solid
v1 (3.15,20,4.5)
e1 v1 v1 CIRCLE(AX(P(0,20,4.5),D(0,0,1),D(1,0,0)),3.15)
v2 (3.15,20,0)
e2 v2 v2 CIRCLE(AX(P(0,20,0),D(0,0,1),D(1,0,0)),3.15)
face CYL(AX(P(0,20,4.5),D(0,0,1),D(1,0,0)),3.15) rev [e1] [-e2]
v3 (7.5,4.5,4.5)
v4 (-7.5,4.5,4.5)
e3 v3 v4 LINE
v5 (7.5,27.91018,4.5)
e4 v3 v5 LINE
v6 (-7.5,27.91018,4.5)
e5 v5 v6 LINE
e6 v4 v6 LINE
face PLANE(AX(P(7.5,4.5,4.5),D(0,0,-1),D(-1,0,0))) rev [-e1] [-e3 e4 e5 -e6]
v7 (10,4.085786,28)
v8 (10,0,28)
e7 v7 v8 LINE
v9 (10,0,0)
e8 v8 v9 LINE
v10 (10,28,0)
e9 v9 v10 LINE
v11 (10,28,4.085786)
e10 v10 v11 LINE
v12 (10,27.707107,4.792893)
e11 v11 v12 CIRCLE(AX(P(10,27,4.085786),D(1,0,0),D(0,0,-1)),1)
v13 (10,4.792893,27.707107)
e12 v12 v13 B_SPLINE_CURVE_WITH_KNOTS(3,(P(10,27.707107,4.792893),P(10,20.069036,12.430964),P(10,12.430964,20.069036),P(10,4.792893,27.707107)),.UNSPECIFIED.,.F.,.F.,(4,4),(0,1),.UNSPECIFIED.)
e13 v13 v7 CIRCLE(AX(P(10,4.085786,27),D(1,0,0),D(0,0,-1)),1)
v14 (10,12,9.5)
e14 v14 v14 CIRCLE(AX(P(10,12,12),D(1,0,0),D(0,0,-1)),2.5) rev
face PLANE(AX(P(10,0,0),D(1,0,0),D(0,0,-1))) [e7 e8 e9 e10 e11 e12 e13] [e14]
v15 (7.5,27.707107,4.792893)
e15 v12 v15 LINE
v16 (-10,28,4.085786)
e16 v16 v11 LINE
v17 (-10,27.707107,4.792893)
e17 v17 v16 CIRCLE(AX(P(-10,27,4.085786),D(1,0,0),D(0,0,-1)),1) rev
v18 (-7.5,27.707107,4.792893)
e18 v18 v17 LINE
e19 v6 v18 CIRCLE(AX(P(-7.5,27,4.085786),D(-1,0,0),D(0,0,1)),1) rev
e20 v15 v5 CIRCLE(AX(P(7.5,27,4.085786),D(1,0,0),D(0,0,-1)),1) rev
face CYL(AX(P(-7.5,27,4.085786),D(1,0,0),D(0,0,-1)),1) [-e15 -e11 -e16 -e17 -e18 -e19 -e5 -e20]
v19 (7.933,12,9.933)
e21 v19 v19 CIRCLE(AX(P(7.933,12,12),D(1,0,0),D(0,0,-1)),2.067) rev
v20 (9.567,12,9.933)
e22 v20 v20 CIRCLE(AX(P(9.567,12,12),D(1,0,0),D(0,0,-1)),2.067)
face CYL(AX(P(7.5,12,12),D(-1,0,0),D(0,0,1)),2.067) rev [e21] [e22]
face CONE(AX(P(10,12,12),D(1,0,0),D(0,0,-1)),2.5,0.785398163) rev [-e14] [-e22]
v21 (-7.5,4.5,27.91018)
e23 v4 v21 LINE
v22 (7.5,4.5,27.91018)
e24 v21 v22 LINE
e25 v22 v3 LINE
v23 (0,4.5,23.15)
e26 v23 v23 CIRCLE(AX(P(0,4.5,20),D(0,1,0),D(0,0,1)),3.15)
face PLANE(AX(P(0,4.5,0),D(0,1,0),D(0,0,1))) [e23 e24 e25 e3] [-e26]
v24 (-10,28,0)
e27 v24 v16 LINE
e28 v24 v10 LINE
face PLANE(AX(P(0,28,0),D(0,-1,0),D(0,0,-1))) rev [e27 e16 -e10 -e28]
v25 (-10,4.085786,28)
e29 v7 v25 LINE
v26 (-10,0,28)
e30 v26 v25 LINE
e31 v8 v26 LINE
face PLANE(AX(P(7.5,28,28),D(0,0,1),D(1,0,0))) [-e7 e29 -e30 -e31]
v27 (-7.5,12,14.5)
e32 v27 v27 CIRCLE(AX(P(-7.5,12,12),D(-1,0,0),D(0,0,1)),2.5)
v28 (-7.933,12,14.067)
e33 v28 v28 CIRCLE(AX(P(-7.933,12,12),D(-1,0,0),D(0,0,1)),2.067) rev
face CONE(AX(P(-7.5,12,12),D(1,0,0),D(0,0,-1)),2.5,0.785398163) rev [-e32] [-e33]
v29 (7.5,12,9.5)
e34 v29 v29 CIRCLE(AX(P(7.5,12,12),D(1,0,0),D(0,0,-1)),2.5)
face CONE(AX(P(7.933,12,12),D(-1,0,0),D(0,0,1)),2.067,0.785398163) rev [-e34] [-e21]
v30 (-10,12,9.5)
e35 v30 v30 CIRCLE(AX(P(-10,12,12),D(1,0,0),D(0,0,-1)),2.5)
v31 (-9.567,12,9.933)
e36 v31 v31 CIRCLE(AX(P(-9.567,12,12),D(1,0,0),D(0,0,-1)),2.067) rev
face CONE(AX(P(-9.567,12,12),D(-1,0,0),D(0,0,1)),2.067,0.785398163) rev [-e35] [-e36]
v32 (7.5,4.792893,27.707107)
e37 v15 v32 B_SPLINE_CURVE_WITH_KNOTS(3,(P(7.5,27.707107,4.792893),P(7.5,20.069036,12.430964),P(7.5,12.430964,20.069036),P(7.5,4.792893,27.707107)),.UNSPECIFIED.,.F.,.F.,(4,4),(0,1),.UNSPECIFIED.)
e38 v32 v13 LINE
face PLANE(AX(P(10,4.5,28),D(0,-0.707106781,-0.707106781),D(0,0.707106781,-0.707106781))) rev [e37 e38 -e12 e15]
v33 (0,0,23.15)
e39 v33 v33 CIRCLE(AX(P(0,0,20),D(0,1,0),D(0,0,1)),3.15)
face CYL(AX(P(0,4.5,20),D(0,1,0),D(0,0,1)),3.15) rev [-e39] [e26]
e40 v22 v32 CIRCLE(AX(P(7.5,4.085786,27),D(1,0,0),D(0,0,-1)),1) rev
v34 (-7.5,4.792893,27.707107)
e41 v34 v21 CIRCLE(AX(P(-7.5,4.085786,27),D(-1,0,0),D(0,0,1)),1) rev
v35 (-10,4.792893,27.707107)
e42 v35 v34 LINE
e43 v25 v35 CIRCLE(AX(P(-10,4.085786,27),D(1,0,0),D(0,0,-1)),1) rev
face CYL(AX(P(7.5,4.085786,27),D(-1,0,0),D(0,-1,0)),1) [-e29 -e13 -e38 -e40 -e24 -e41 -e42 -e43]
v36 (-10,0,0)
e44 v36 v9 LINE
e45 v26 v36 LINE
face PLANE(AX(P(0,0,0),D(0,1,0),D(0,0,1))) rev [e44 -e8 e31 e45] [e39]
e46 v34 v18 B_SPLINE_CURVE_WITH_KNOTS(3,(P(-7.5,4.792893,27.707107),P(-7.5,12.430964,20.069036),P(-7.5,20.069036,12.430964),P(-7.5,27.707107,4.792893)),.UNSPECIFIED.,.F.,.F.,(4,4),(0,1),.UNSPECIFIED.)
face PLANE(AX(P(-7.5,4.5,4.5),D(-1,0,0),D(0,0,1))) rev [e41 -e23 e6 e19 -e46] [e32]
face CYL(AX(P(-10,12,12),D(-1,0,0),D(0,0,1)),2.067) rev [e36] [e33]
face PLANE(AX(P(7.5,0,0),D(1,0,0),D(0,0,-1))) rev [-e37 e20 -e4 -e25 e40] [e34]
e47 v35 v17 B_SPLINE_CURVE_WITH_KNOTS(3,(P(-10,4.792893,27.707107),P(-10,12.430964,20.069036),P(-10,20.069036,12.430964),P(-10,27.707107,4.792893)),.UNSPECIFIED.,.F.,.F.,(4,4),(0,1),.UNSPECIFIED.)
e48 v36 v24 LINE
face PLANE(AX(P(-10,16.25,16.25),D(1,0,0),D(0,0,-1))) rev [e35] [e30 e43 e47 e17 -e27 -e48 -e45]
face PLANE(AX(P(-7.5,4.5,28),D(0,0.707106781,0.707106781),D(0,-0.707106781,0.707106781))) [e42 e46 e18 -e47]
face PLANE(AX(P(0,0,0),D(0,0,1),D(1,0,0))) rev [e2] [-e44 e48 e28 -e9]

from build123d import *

# Parameters (mm, degrees)
BOSS_EXTRUDE1_DEPTH        = 2.5
SKETCH2_W                  = 15
SKETCH2_H                  = 23.5
BOSS_EXTRUDE2_DEPTH        = 23.5
SKETCH3_W                  = 17.5
SKETCH3_H                  = 23.5
BOSS_EXTRUDE3_DEPTH        = 4.5
SKETCH4_W                  = 17.5
SKETCH4_H                  = 28
BOSS_EXTRUDE4_DEPTH        = 4.5
SKETCH5_W                  = 15
SKETCH5_H                  = 23.5
CUT_EXTRUDE1_DEPTH         = 23.5
BOSS_EXTRUDE5_DEPTH        = 2.5
M3_5_CLEARANCE_HOLE1_D     = 4.134
M3_5_CLEARANCE_HOLE1_DEPTH = 2.5
F_6_3_6_3_DIAMETER_HOLE1_D = 6.3
F_6_3_6_3_DIAMETER_HOLE2_D = 6.3
M3_5_CLEARANCE_HOLE2_D     = 4.134
M3_5_CLEARANCE_HOLE2_DEPTH = 20
CHAMFER1_SIZE              = 0.433
FILLET2_START              = -11
FILLET2_DEPTH              = 22


with BuildPart() as part:
    # Sketch1 → Boss-Extrude1 (new body)
    with BuildSketch(Plane(origin=(-10, 0, 0), x_dir=(0, -1, 0), z_dir=(-1, 0, 0))):
        with BuildLine():
            Line((-27.707106781, 4.792893219), (-28, 4.5))
            Line((-28, 4.5), (-4.5, 4.5))
            Line((-4.5, 4.5), (-4.5, 28))
            Line((-4.5, 28), (-4.792893219, 27.707106781))
            add(Edge.make_bspline(
                [(-4.792893219, 27.707106781), (-12.430964406, 20.069035594), (-20.069035594, 12.430964406), (-27.707106781, 4.792893219)],
                knots=[0, 0, 0, 0, 1, 1, 1, 1], degree=3))
        make_face()
    extrude(amount=-BOSS_EXTRUDE1_DEPTH)

    # Sketch2 → Boss-Extrude2 (add)
    with BuildSketch(Plane.XZ.offset(-4.5)):
        with Locations((0, 16.25)):
            Rectangle(SKETCH2_W, SKETCH2_H)
    extrude(amount=-BOSS_EXTRUDE2_DEPTH)

    # Sketch3 → Boss-Extrude3 (add)
    with BuildSketch(Plane(origin=(0, 0, 4.5), x_dir=(-1, 0, 0), z_dir=(0, 0, -1))):
        with Locations((1.25, 16.25)):
            Rectangle(SKETCH3_W, SKETCH3_H)
    extrude(amount=BOSS_EXTRUDE3_DEPTH)

    # Sketch4 → Boss-Extrude4 (add)
    with BuildSketch(Plane.XZ.offset(-4.5)):
        with Locations((-1.25, 14)):
            Rectangle(SKETCH4_W, SKETCH4_H)
    extrude(amount=BOSS_EXTRUDE4_DEPTH)

    # Sketch5 → Cut-Extrude1 (cut)
    with BuildSketch(Plane(origin=(0, 28, 0), x_dir=(-1, 0, 0), z_dir=(0, 1, 0))):
        with Locations((0, 16.25)):
            Rectangle(SKETCH5_W, SKETCH5_H)
    extrude(amount=-CUT_EXTRUDE1_DEPTH, mode=Mode.SUBTRACT)

    # Sketch6 → Boss-Extrude5 (add)
    with BuildSketch(Plane(origin=(7.5, 0, 0), x_dir=(0, 0, -1), z_dir=(1, 0, 0))):
        with BuildLine():
            Line((-28, 0), (-28, 4.5))
            Line((-28, 4.5), (-27.707106781, 4.792893219))
            add(Edge.make_bspline(
                [(-4.792893219, 27.707106781), (-12.430964406, 20.069035594), (-20.069035594, 12.430964406), (-27.707106781, 4.792893219)],
                knots=[0, 0, 0, 0, 1, 1, 1, 1], degree=3))
            Line((-4.792893219, 27.707106781), (-4.5, 28))
            Line((-4.5, 28), (0, 28))
            Line((0, 28), (0, 0))
            Line((0, 0), (-28, 0))
        make_face()
    extrude(amount=BOSS_EXTRUDE5_DEPTH)

    # M3.5 Clearance Hole1
    with Locations(Plane.ZY.offset(-7.5)):
        with Locations((12, 12)):
            Hole(M3_5_CLEARANCE_HOLE1_D / 2, depth=M3_5_CLEARANCE_HOLE1_DEPTH)

    # Ø6.3 (6.3) Diameter Hole1 (through all)
    with Locations(Plane(origin=(0, 4.5, 0), x_dir=(1, 0, 0), z_dir=(0, 1, 0))):
        with Locations((0, -20)):
            Hole(F_6_3_6_3_DIAMETER_HOLE1_D / 2)

    # Ø6.3 (6.3) Diameter Hole2 (through all)
    with Locations(Plane.XY.offset(4.5)):
        with Locations((0, 20)):
            Hole(F_6_3_6_3_DIAMETER_HOLE2_D / 2)

    # M3.5 Clearance Hole2
    with Locations(Plane.ZY.offset(10)):
        with Locations((12, 12)):
            Hole(M3_5_CLEARANCE_HOLE2_D / 2, depth=M3_5_CLEARANCE_HOLE2_DEPTH)

    # Chamfer1
    chamfer1_edges = [part.edges().sort_by_distance(p)[0] for p in [
        (-7.5, 12, 14.067),
        (-10, 12, 14.067),
        (7.5, 12, 14.067),
        (10, 12, 14.067),
    ]]
    chamfer(chamfer1_edges, length=CHAMFER1_SIZE)

    # Fillet2: read off the stored shape, not the designer's step
    # Fillet2 outline → Fillet2 (cut)
    with BuildSketch(Plane.YZ.offset(FILLET2_START)):
        with BuildLine():
            Line((4.5, 28), (4.085786438, 28))
            ThreePointArc((4.085786438, 28), (4.46846987, 27.923879533), (4.792893219, 27.707106781))
            Line((4.792893219, 27.707106781), (4.5, 28))
        make_face()
        with BuildLine():
            Line((28, 4.5), (27.707106781, 4.792893219))
            ThreePointArc((27.707106781, 4.792893219), (27.923879533, 4.46846987), (28, 4.085786438))
            Line((28, 4.085786438), (28, 4.5))
        make_face()
    extrude(amount=FILLET2_DEPTH, mode=Mode.SUBTRACT)


solid = part.part
